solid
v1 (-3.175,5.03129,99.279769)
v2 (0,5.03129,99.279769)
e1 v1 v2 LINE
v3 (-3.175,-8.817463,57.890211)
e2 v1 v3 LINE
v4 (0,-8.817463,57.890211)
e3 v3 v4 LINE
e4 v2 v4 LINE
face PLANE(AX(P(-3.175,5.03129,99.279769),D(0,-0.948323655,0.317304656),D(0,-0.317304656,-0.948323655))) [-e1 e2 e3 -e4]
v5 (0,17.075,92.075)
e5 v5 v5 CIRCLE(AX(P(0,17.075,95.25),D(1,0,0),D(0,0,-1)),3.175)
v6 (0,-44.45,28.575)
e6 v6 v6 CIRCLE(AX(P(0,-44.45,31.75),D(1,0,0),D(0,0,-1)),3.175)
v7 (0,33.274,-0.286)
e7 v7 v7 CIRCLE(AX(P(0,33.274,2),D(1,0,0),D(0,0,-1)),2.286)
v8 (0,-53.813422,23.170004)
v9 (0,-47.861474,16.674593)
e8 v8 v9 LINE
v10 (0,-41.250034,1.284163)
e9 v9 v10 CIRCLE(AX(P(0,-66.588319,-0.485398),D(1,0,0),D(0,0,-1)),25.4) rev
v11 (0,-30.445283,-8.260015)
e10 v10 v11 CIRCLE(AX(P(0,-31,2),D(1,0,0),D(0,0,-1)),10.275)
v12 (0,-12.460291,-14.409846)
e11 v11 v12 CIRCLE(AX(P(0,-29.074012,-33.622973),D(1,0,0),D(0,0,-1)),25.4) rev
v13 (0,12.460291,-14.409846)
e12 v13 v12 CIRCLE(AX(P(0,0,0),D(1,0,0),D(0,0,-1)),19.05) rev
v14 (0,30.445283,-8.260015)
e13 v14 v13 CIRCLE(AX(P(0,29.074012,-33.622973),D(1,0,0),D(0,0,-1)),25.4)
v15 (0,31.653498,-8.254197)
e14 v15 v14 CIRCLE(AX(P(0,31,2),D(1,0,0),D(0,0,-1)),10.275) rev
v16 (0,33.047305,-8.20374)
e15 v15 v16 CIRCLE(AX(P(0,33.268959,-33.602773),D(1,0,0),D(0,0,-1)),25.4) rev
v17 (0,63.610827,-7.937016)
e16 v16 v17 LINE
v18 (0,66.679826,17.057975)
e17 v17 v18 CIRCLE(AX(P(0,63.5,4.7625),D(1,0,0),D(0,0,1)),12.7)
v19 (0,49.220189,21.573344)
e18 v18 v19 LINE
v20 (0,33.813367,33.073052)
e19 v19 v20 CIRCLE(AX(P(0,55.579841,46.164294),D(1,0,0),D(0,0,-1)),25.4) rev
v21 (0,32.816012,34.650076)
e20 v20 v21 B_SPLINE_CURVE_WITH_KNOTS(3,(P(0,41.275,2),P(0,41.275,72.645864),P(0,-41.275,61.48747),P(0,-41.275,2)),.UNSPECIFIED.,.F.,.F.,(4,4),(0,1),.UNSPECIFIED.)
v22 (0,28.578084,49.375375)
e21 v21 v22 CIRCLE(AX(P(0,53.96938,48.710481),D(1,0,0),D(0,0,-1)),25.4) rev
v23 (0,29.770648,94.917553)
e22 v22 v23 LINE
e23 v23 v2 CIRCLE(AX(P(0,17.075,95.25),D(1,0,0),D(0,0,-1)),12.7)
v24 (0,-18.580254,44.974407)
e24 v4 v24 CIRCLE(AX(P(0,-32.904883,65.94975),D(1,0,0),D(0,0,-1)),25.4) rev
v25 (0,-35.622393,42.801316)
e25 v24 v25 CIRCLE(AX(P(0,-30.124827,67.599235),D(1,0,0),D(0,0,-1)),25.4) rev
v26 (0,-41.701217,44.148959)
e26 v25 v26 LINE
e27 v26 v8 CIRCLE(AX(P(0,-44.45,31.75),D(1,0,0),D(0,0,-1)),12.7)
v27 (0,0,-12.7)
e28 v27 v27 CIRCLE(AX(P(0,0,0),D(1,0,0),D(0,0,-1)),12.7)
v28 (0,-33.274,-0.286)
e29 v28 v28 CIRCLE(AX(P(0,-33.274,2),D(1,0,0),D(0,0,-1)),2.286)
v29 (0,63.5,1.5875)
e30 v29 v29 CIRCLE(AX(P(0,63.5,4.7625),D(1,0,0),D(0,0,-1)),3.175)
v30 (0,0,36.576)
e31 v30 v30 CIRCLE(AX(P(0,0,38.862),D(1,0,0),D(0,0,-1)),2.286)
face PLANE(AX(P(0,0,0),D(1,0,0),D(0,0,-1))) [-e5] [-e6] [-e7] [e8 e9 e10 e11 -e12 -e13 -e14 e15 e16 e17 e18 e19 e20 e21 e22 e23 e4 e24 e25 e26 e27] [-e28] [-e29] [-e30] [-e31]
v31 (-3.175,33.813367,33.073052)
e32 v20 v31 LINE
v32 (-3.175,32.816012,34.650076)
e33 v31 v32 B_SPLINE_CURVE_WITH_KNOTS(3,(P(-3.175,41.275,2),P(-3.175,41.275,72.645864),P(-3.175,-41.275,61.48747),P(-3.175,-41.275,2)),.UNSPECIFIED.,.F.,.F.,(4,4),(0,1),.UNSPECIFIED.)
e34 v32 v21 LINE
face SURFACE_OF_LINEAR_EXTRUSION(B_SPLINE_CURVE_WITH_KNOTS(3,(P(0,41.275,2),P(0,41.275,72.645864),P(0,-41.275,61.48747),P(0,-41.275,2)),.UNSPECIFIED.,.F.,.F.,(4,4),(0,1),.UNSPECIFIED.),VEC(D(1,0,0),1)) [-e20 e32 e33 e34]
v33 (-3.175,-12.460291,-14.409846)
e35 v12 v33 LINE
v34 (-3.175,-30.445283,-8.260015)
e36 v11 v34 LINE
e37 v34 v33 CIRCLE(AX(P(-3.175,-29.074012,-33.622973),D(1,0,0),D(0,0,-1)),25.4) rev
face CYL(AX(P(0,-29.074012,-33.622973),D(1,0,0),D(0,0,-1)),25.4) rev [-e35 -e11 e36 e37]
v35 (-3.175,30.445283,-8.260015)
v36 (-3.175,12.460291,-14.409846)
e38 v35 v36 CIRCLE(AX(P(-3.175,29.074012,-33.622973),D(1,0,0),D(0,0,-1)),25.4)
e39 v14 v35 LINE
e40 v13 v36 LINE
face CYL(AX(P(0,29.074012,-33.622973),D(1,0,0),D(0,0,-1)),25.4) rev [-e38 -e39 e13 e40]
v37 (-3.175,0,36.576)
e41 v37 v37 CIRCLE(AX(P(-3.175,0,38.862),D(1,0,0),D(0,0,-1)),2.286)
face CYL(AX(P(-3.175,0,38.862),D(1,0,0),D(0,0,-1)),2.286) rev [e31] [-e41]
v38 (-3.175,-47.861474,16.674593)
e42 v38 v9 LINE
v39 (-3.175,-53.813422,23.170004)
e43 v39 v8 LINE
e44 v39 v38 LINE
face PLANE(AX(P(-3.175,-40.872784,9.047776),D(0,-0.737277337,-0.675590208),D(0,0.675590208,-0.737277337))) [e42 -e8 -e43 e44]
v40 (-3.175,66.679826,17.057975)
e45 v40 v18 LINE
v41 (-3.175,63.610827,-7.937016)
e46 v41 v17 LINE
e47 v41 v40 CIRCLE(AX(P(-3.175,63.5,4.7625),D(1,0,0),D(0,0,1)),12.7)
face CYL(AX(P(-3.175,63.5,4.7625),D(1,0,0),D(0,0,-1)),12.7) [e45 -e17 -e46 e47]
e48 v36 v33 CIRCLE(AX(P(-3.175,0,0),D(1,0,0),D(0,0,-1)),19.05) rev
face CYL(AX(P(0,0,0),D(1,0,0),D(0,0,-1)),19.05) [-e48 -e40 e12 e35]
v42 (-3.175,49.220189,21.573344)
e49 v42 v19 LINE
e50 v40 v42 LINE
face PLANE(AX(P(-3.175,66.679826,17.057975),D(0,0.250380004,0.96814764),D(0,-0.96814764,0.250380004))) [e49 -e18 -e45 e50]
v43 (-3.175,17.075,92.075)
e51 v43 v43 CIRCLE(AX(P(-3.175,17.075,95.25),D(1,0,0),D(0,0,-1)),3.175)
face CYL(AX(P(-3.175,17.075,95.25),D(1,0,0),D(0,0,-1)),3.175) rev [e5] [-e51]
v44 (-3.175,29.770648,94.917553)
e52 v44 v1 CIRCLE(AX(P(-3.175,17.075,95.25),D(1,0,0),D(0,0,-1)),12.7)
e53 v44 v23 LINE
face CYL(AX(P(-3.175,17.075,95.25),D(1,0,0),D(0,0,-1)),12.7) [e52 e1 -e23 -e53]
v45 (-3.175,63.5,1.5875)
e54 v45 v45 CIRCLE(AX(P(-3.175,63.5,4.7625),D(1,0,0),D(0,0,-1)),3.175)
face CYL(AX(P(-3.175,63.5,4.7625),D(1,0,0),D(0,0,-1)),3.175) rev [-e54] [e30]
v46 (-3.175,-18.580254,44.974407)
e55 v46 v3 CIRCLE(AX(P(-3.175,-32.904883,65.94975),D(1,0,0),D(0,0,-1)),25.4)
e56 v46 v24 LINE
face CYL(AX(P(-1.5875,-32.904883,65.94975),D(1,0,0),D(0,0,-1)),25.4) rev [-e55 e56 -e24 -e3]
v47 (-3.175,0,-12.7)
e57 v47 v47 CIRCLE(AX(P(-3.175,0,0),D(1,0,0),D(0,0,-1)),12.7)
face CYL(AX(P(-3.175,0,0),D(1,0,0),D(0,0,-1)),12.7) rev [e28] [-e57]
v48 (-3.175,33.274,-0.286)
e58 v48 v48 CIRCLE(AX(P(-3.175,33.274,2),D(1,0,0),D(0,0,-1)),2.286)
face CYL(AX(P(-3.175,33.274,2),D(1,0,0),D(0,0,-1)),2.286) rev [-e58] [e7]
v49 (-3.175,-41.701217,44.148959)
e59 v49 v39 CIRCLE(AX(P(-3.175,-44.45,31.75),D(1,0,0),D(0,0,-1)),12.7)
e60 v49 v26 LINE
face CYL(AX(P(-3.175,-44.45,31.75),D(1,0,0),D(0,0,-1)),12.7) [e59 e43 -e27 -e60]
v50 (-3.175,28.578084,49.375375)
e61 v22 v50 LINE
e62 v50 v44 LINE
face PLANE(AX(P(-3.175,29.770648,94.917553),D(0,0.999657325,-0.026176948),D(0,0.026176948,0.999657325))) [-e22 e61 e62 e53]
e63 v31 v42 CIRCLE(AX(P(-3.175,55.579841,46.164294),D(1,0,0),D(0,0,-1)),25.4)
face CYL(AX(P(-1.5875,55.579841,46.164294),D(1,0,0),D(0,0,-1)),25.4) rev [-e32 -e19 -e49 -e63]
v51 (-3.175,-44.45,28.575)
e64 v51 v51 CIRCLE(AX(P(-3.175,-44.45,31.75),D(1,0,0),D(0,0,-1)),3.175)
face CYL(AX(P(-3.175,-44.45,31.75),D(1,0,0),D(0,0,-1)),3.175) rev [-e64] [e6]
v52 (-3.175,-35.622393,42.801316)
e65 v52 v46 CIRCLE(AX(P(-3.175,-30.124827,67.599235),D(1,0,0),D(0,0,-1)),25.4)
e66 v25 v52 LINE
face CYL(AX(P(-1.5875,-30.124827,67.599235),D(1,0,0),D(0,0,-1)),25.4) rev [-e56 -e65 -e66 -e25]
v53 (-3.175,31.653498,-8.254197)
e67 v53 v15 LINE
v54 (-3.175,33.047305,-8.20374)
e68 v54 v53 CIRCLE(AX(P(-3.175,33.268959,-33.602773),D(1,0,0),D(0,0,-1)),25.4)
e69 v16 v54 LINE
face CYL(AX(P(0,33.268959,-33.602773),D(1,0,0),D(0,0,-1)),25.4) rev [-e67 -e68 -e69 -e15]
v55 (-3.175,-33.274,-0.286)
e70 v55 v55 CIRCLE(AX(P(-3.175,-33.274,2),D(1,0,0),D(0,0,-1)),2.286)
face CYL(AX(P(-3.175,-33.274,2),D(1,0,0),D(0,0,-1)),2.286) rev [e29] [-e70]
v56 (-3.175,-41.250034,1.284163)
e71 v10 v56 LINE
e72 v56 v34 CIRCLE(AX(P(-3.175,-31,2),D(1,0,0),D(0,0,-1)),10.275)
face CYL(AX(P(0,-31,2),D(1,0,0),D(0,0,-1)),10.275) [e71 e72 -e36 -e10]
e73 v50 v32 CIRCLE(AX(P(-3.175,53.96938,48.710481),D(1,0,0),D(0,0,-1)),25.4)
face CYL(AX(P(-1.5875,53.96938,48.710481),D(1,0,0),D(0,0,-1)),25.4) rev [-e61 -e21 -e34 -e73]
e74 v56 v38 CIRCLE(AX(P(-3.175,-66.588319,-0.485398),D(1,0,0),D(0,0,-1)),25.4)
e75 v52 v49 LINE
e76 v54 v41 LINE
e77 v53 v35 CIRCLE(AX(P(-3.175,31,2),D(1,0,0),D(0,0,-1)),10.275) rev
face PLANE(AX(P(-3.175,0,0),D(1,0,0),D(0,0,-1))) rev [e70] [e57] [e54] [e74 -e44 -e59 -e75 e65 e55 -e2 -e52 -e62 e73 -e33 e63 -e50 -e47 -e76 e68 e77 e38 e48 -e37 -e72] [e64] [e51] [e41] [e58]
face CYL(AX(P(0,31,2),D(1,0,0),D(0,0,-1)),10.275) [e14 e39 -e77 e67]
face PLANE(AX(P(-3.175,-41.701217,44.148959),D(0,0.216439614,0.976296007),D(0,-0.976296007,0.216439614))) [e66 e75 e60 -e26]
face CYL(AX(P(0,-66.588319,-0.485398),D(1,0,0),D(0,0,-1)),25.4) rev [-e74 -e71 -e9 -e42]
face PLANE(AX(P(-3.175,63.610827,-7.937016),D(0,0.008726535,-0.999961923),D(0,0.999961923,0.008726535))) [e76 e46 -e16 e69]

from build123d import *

# Parameters (mm, degrees)
SKETCH1_W          = 101.6
SKETCH1_H          = 82.55
SKETCH1_R          = 12.7
BASE_FLANGE1_DEPTH = 3.175
SKETCH6_R          = 2.286
CUT_EXTRUDE1_DEPTH = 66.531261624
SKETCH7_R          = 3.175
TAB1_DEPTH         = 3.175
FILLET1_R          = 25.4


# Sheet-metal steps are written as plain solids
with BuildPart() as part:
    # Sketch1 → Base-Flange1 (new body)
    with BuildSketch(Plane(origin=(0, 0, 0), x_dir=(0, 0, -1), z_dir=(1, 0, 0))):
        Rectangle(SKETCH1_W, SKETCH1_H)
        Circle(SKETCH1_R, mode=Mode.SUBTRACT)
    extrude(amount=-BASE_FLANGE1_DEPTH)

    # Sketch6 → Cut-Extrude1 (cut, through all)
    with BuildSketch(Plane(origin=(0, 0, 0), x_dir=(0, 0, -1), z_dir=(1, 0, 0))):
        with BuildLine():
            Line((-50.8, 0), (-50.8, -41.275))
            Line((-50.8, -41.275), (-2, -41.275))
            add(Edge.make_bspline(
                [(-50.8, 0), (-49.405200746, -20.6375), (-31.743734825, -41.275), (-2, -41.275)],
                knots=[0.5, 0.5, 0.5, 0.5, 1, 1, 1, 1], degree=3))
        make_face()
        with BuildLine():
            ThreePointArc((8.260015314, -30.445283168), (5.45906631, -38.06667919), (-2, -41.275))
            Line((-2, -41.275), (50.8, -41.275))
            Line((50.8, -41.275), (50.8, 41.275))
            Line((50.8, 41.275), (-2, 41.275))
            ThreePointArc((-2, 41.275), (5.45906631, 38.06667919), (8.260015314, 30.445283168))
            ThreePointArc((8.260015314, 30.445283168), (9.58920866, 20.855850918), (14.409845519, 12.460291013))
            ThreePointArc((14.409845519, 12.460291013), (19.05, 0), (14.409845519, -12.460291013))
            ThreePointArc((14.409845519, -12.460291013), (9.58920866, -20.855850918), (8.260015314, -30.445283168))
        make_face()
        with BuildLine():
            Line((-50.8, 41.275), (-50.8, 5.257542394))
            add(Edge.make_bspline(
                [(-2, 41.275), (-34.31608403, 41.275), (-49.514685749, 24.001471649), (-50.8, 5.257542394)],
                knots=[0, 0, 0, 0, 0.457437737, 0.457437737, 0.457437737, 0.457437737], degree=3))
            Line((-2, 41.275), (-50.8, 41.275))
        make_face()
        with Locations((-38.862, 0)):
            Circle(SKETCH6_R)
        with Locations((-2, -33.274)):
            Circle(SKETCH6_R)
        with Locations((-2, 33.274)):
            Circle(SKETCH6_R)
    extrude(amount=-CUT_EXTRUDE1_DEPTH, mode=Mode.SUBTRACT)

    # Sketch7 → Tab1 (add)
    # profile 1 of 3: a face of its own
    with BuildSketch(Plane(origin=(0, 0, 0), x_dir=(0, 0, -1), z_dir=(1, 0, 0))):
        with BuildLine():
            Line((-94.917552756, 29.770648167), (-40.208700014, 28.33804644))
            add(Edge.make_bspline(
                [(-40.208700014, 28.33804644), (-46.786875633, 21.92230562), (-50.218303551, 13.740508394), (-50.8, 5.257542394)],
                knots=[0.250414508, 0.250414508, 0.250414508, 0.250414508, 0.457437737, 0.457437737, 0.457437737, 0.457437737], degree=3))
            Line((-50.8, 5.257542394), (-50.8, 0))
            add(Edge.make_bspline(
                [(-50.8, 0), (-50.523888569, -4.085354674), (-49.610330365, -8.170709348), (-48.091785573, -12.095969996)],
                knots=[0.5, 0.5, 0.5, 0.5, 0.598978914, 0.598978914, 0.598978914, 0.598978914], degree=3))
            Line((-48.091785573, -12.095969996), (-99.279769136, 5.031289719))
            ThreePointArc((-99.279769136, 5.031289719), (-107.757058463, 19.280331996), (-94.917552756, 29.770648167))
        make_face()
        with Locations((-95.25, 17.07500014)):
            Circle(SKETCH7_R, mode=Mode.SUBTRACT)
    # profile 2 of 3: a face of its own
    with BuildSketch(Plane(origin=(0, 0, 0), x_dir=(0, 0, -1), z_dir=(1, 0, 0))):
        with BuildLine():
            Line((-44.14895929, -41.701216903), (-40.415374595, -24.860104669))
            add(Edge.make_bspline(
                [(-40.415374595, -24.860104669), (-33.280436064, -33.135041664), (-22.659787261, -39.285311117), (-9.047775931, -40.872784018)],
                knots=[0.713798262, 0.713798262, 0.713798262, 0.713798262, 0.959139114, 0.959139114, 0.959139114, 0.959139114], degree=3))
            Line((-9.047775931, -40.872784018), (-23.170004363, -53.813422177))
            ThreePointArc((-23.170004363, -53.813422177), (-38.1, -55.448522628), (-44.14895929, -41.701216903))
        make_face()
        with Locations((-31.75, -44.45)):
            Circle(SKETCH7_R, mode=Mode.SUBTRACT)
    # profile 3 of 3: a face of its own
    with BuildSketch(Plane(origin=(0, 0, 0), x_dir=(0, 0, -1), z_dir=(1, 0, 0))):
        with BuildLine():
            Line((7.937016423, 63.610827001), (8.211666218, 32.13907772))
            ThreePointArc((8.211666218, 32.13907772), (4.850970786, 38.657664415), (-2, 41.275))
            add(Edge.make_bspline(
                [(-2, 41.275), (-10.740165269, 41.275), (-18.228222741, 40.011477764), (-24.527562549, 37.79707419)],
                knots=[0, 0, 0, 0, 0.123718004, 0.123718004, 0.123718004, 0.123718004], degree=3))
            Line((-24.527562549, 37.79707419), (-17.057975033, 66.679826051))
            ThreePointArc((-17.057975033, 66.679826051), (-3.214759339, 76.105336126), (7.937016423, 63.610827001))
        make_face()
        with Locations((-4.7625, 63.5)):
            Circle(SKETCH7_R, mode=Mode.SUBTRACT)
    extrude(amount=-TAB1_DEPTH)

    # Fillet1
    # the kernel refuses this fillet: 25.4 mm, written as the material it adds along each edge
    with BuildSketch(Plane(origin=(0, -12.095969996, 48.091785573), x_dir=(0, -0.8940853076070706, -0.44789670987982283), z_dir=(-1, 0, 0))) as fillet1_piece_1:
        with BuildLine():
            CenterArc((10.606420456, 25.28678712), FILLET1_R, 225.10881891, 39.479525683)
            Line((-7.319947942, 7.29219582), (-7.67847531, 6.932303994))
            Line((-7.67847531, 6.932303994), (-0.358527368, -0.359891826))
            Line((-0.358527368, -0.359891826), (0.04832888, -0.505695876))
            ThreePointArc((0.04832888, -0.505695876), (4.105397819, -0.313189565), (8.163015374, -0.505735742))
            Line((8.163015374, -0.505735742), (8.210925278, 0))
        make_face()
    extrude(amount=3.175)
    with BuildSketch(Plane(origin=(0, -24.860104669, 40.415374595), x_dir=(0, 0.8184198405618281, 0.5746207136666339), z_dir=(-1, 0, 0))) as fillet1_piece_2:
        with BuildLine():
            CenterArc((11.311656293, -25.273029086), FILLET1_R, 95.731310995, 41.841763873)
            Line((-7.437058628, -8.136935925), (-7.812032926, -7.794214062))
            Line((-7.812032926, -7.794214062), (-0.374974298, 0.342721863))
            Line((-0.374974298, 0.342721863), (0.050418969, 0.505491768))
            ThreePointArc((0.050418969, 0.505491768), (4.387605763, 0.289082367), (8.724392403, 0.505460582))
            Line((8.724392403, 0.505460582), (8.775123067, 0))
        make_face()
    extrude(amount=3.175)
    with BuildSketch(Plane(origin=(0, -40.872784018, 9.047775931), x_dir=(0, -0.04853483979472319, -0.9988214902204), z_dir=(-1, 0, 0))) as fillet1_piece_3:
        with BuildLine():
            CenterArc((10.770038636, 25.222537483), FILLET1_R, 224.718065589, 38.505093781)
            Line((-7.27863381, 7.350620325), (-9.083501055, 5.563428609))
            Line((-9.083501055, 5.563428609), (-1.804867245, -1.787191716))
            Line((-1.804867245, -1.787191716), (0.171432812, -2.534208119))
            ThreePointArc((0.171432812, -2.534208119), (6.935713053, -2.477327294), (7.473046138, -2.522253748))
            Line((7.473046138, -2.522253748), (7.772772728, 0))
        make_face()
    extrude(amount=3.175)
    with BuildSketch(Plane(origin=(0, 28.33804644, 40.208700014), x_dir=(0, 0.6273452084860717, -0.7787412852735929), z_dir=(-1, 0, 0))) as fillet1_piece_4:
        with BuildLine():
            CenterArc((9.459006839, -25.293729314), FILLET1_R, 95.242990238, 35.111537056)
            Line((-6.987881866, -5.937597161), (-7.31681964, -5.550474518))
            Line((-7.31681964, -5.550474518), (-0.328937774, 0.387122643))
            Line((-0.328937774, 0.387122643), (0.048065336, 0.505720994))
            ThreePointArc((0.048065336, 0.505720994), (3.568700205, 0.341549606), (7.091539297, 0.505874586))
            Line((7.091539297, 0.505874586), (7.137960229, 0))
        make_face()
    extrude(amount=3.175)
    with BuildSketch(Plane(origin=(0, 37.79707419, 24.527562549), x_dir=(0, -0.42252064373268267, 0.9063533006613478), z_dir=(-1, 0, 0))) as fillet1_piece_5:
        with BuildLine():
            CenterArc((12.096936965, 25.25943543), FILLET1_R, 219.493828852, 44.475589611)
            Line((-7.504067493, 9.105159703), (-7.896087582, 8.782074189))
            Line((-7.896087582, 8.782074189), (-0.392020089, -0.323085515))
            Line((-0.392020089, -0.323085515), (0.049799336, -0.505553188))
            ThreePointArc((0.049799336, -0.505553188), (4.714693558, -0.268029159), (9.375061322, -0.505188709))
            Line((9.375061322, -0.505188709), (9.428431432, 0))
        make_face()
    extrude(amount=3.175)
    with BuildSketch(Plane(origin=(0, 32.13907772, -8.211666218), x_dir=(0, -0.9961860509350137, -0.08725452379391116), z_dir=(-1, 0, 0))) as fillet1_piece_6:
        with BuildLine():
            CenterArc((1.089917285, -25.392853706), FILLET1_R, 91.359162517, 3.146518864)
            Line((-0.905454606, -0.071351164), (-0.945362044, 0.435078887))
            Line((-0.945362044, 0.435078887), (-0.039907438, 0.506430051))
            Line((-0.039907438, 0.506430051), (0.012049575, 0.507857074))
            ThreePointArc((0.012049575, 0.507857074), (0.243719262, 0.505109127), (0.47538895, 0.507857074))
            Line((0.47538895, 0.507857074), (0.487438525, 0))
        make_face()
    extrude(amount=3.175)


solid = part.part
